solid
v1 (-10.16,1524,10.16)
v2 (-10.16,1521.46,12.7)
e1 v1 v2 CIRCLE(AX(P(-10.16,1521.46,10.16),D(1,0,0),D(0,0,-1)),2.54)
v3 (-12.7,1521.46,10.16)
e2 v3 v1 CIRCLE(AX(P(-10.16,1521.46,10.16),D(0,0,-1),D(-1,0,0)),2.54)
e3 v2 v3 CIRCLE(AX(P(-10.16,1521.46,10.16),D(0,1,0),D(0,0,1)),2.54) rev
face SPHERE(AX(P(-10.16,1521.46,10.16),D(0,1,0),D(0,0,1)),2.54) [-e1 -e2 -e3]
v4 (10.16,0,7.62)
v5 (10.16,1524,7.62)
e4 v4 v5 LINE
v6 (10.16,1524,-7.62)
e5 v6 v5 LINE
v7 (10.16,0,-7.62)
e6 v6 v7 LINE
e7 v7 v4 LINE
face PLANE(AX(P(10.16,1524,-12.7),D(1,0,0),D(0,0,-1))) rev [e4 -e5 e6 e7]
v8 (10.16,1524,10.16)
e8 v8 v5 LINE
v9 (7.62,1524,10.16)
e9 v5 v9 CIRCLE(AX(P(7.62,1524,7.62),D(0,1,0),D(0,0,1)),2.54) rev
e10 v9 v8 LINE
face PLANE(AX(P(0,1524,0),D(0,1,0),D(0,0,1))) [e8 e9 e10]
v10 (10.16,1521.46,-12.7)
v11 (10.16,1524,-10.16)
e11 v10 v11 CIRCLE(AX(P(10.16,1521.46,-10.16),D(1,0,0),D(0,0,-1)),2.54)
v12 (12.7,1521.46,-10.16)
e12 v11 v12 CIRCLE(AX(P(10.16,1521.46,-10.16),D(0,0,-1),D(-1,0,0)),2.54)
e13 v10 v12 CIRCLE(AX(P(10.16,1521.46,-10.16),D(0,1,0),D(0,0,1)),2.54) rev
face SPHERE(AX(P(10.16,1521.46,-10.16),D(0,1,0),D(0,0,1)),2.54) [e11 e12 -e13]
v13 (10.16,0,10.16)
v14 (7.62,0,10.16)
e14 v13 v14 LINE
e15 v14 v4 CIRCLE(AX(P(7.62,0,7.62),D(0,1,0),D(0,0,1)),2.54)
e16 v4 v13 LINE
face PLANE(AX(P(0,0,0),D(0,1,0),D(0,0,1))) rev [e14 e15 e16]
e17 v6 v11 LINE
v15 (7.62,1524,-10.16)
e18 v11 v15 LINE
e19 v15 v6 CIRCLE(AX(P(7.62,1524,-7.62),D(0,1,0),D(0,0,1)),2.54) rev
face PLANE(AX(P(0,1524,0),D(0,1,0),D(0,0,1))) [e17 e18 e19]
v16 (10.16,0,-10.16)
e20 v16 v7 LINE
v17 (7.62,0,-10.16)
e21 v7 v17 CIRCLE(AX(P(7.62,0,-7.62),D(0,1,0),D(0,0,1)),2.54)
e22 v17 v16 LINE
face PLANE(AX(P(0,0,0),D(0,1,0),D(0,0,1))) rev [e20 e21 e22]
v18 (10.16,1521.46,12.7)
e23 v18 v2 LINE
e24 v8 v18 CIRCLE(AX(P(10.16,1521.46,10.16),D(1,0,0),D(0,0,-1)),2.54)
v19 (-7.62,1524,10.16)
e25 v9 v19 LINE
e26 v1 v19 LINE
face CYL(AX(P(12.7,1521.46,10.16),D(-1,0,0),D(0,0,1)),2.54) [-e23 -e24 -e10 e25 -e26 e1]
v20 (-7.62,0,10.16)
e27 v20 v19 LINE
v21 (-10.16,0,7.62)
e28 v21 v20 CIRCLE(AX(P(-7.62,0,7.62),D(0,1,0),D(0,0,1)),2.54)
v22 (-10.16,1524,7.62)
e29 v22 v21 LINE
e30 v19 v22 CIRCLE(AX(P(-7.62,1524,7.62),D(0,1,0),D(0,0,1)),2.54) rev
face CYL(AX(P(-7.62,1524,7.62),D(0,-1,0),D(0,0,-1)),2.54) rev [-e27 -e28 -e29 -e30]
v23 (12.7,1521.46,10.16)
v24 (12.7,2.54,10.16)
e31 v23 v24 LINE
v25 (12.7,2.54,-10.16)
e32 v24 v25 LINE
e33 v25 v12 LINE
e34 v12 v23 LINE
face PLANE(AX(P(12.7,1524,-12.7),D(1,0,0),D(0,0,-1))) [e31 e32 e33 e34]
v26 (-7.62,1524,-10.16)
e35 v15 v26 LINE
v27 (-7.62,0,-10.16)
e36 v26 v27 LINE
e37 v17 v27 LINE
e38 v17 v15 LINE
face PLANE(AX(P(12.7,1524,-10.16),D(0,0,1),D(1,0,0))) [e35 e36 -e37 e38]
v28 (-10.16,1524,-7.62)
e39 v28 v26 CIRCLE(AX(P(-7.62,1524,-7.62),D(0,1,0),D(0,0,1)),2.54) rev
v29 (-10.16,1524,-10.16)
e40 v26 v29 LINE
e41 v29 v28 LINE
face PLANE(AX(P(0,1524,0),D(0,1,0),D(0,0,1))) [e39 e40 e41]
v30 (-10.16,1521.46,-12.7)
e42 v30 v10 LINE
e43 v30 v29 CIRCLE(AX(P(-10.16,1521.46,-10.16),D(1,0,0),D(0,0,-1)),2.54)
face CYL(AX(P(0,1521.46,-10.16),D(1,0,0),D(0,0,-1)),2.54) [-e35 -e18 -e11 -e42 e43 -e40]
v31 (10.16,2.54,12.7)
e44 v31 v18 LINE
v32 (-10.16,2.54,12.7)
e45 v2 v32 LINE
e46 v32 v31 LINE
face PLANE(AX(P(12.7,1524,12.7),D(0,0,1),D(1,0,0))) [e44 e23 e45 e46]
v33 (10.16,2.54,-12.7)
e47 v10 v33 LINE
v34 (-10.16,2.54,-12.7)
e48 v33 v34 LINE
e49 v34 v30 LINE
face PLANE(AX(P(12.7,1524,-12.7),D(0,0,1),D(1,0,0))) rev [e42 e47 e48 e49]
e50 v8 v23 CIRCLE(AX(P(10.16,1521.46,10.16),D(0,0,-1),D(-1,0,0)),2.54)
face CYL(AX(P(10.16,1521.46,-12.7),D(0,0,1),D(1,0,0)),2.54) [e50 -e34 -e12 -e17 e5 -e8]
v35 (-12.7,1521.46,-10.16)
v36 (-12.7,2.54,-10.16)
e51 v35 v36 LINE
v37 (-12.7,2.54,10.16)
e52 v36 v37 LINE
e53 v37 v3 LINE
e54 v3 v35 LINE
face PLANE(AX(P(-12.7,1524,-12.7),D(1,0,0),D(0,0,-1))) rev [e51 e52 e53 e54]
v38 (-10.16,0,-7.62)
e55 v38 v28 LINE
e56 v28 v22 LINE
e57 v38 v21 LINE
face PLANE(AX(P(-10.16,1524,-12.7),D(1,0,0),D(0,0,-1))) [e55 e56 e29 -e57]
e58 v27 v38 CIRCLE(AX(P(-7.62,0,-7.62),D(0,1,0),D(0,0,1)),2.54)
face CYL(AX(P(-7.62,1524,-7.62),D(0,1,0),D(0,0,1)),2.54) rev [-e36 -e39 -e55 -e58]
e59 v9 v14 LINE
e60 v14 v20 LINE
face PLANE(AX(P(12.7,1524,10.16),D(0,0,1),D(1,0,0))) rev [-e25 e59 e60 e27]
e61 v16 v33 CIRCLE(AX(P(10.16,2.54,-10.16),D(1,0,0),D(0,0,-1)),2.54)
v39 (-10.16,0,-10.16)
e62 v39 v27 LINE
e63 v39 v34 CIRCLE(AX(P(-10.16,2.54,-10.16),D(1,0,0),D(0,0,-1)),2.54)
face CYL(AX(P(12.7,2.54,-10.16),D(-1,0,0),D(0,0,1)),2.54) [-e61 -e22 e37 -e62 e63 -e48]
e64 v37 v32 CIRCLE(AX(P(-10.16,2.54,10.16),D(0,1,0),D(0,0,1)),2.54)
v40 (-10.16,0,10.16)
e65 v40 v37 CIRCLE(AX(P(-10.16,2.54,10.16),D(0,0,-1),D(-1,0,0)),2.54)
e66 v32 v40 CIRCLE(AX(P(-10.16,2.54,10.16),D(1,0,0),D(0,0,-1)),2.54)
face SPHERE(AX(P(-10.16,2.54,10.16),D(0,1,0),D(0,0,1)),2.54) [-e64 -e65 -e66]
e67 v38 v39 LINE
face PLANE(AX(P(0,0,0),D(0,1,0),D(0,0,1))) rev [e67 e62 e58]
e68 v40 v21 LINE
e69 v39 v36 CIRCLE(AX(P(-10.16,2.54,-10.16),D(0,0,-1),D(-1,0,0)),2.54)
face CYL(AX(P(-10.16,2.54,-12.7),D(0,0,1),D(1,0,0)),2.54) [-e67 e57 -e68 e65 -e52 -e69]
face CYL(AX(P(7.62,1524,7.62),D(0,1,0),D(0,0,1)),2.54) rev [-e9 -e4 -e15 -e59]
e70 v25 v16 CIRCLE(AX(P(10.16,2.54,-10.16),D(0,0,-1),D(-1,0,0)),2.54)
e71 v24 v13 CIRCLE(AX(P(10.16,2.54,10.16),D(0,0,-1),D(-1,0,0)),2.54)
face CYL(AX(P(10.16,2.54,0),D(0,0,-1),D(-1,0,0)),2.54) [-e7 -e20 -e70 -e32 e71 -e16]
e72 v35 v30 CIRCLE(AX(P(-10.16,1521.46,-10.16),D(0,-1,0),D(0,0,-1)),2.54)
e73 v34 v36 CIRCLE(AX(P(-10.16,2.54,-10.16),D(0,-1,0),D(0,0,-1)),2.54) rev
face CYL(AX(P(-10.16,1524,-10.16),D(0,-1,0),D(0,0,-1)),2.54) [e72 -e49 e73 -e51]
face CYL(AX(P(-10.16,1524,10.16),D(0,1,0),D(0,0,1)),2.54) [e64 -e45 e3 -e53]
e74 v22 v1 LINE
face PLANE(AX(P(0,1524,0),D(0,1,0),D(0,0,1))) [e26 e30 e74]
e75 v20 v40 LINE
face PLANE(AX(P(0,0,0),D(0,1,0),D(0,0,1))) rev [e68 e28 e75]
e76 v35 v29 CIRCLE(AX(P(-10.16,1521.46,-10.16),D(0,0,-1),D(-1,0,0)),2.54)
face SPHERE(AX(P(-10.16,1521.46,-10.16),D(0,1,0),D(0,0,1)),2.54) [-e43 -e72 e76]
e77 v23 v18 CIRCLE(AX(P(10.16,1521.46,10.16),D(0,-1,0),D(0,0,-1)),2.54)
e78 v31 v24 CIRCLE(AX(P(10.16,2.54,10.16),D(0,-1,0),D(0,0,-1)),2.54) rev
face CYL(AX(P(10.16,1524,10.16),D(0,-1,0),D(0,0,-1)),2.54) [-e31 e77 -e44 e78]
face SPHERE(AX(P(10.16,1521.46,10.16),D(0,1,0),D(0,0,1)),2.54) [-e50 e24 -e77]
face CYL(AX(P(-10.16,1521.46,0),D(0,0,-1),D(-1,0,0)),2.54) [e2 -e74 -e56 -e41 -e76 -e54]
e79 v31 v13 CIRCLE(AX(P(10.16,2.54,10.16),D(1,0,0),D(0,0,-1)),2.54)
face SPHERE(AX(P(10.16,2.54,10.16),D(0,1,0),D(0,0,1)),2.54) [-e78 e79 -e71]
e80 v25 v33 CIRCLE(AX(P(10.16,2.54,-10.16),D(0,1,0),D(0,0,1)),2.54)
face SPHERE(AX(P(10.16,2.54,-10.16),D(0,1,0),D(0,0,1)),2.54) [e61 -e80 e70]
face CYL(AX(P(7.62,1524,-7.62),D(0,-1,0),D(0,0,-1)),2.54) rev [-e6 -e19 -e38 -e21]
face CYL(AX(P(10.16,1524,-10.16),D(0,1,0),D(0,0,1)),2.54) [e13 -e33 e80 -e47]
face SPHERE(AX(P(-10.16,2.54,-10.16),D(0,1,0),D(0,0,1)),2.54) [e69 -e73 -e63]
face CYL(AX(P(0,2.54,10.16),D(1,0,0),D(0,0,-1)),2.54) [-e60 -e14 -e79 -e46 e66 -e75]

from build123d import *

# Parameters (mm, degrees)
SKETCH4_W           = 25.4
SKETCH4_H           = 25.4
BOSS_EXTRUDE6_DEPTH = 1524
SHELL1_T            = -2.54
FILLET1_R           = 2.54
FILLET2_R           = 2.54
FILLET3_R           = 2.54
FILLET5_R           = 2.54
FILLET6_R           = 2.54


with BuildPart() as part:
    # Sketch4 → Boss-Extrude6 (new body)
    with BuildSketch(Plane(origin=(0, 0, 0), x_dir=(1, 0, 0), z_dir=(0, 1, 0))):
        Rectangle(SKETCH4_W, SKETCH4_H)
    extrude(amount=BOSS_EXTRUDE6_DEPTH)

    # Shell1
    shell1_openings = [part.faces().sort_by_distance(p)[0] for p in [
        (0, 1524, 0),
        (0, 0, 0),
    ]]
    offset(amount=SHELL1_T, openings=shell1_openings, kind=Kind.INTERSECTION)

    # Fillet1
    fillet1_edges = [part.edges().sort_by_distance(p)[0] for p in [
        (12.7, 762, -12.7),
        (12.7, 762, 12.7),
        (-12.7, 762, 12.7),
        (-12.7, 762, -12.7),
    ]]
    fillet(fillet1_edges, radius=FILLET1_R)

    # Fillet2
    fillet2_edges = [part.edges().sort_by_distance(p)[0] for p in [
        (-10.16, 762, -10.16),
    ]]
    fillet(fillet2_edges, radius=FILLET2_R)

    # Fillet3
    fillet3_edges = [part.edges().sort_by_distance(p)[0] for p in [
        (10.16, 762, -10.16),
        (-10.16, 762, 10.16),
        (10.16, 762, 10.16),
    ]]
    fillet(fillet3_edges, radius=FILLET3_R)

    # Fillet5
    fillet5_edges = [part.edges().sort_by_distance(p)[0] for p in [
        (0, 1524, 12.7),
        (-12.7, 1524, 0),
        (0, 1524, -12.7),
        (12.7, 1524, 0),
        (-11.956051224, 1524, -11.956051224),
        (11.956051224, 1524, -11.956051224),
        (11.956051224, 1524, 11.956051224),
        (-11.956051224, 1524, 11.956051224),
    ]]
    fillet(fillet5_edges, radius=FILLET5_R - 0.0001)  # a hair under: the kernel refuses the full size

    # Fillet6
    fillet6_edges = [part.edges().sort_by_distance(p)[0] for p in [
        (0, 0, 12.7),
        (0, 0, -12.7),
        (12.7, 0, 0),
        (-12.7, 0, 0),
        (-11.956051224, 0, -11.956051224),
        (11.956051224, 0, -11.956051224),
        (11.956051224, 0, 11.956051224),
        (-11.956051224, 0, 11.956051224),
    ]]
    fillet(fillet6_edges, radius=FILLET6_R - 0.0001)  # a hair under: the kernel refuses the full size


solid = part.part
